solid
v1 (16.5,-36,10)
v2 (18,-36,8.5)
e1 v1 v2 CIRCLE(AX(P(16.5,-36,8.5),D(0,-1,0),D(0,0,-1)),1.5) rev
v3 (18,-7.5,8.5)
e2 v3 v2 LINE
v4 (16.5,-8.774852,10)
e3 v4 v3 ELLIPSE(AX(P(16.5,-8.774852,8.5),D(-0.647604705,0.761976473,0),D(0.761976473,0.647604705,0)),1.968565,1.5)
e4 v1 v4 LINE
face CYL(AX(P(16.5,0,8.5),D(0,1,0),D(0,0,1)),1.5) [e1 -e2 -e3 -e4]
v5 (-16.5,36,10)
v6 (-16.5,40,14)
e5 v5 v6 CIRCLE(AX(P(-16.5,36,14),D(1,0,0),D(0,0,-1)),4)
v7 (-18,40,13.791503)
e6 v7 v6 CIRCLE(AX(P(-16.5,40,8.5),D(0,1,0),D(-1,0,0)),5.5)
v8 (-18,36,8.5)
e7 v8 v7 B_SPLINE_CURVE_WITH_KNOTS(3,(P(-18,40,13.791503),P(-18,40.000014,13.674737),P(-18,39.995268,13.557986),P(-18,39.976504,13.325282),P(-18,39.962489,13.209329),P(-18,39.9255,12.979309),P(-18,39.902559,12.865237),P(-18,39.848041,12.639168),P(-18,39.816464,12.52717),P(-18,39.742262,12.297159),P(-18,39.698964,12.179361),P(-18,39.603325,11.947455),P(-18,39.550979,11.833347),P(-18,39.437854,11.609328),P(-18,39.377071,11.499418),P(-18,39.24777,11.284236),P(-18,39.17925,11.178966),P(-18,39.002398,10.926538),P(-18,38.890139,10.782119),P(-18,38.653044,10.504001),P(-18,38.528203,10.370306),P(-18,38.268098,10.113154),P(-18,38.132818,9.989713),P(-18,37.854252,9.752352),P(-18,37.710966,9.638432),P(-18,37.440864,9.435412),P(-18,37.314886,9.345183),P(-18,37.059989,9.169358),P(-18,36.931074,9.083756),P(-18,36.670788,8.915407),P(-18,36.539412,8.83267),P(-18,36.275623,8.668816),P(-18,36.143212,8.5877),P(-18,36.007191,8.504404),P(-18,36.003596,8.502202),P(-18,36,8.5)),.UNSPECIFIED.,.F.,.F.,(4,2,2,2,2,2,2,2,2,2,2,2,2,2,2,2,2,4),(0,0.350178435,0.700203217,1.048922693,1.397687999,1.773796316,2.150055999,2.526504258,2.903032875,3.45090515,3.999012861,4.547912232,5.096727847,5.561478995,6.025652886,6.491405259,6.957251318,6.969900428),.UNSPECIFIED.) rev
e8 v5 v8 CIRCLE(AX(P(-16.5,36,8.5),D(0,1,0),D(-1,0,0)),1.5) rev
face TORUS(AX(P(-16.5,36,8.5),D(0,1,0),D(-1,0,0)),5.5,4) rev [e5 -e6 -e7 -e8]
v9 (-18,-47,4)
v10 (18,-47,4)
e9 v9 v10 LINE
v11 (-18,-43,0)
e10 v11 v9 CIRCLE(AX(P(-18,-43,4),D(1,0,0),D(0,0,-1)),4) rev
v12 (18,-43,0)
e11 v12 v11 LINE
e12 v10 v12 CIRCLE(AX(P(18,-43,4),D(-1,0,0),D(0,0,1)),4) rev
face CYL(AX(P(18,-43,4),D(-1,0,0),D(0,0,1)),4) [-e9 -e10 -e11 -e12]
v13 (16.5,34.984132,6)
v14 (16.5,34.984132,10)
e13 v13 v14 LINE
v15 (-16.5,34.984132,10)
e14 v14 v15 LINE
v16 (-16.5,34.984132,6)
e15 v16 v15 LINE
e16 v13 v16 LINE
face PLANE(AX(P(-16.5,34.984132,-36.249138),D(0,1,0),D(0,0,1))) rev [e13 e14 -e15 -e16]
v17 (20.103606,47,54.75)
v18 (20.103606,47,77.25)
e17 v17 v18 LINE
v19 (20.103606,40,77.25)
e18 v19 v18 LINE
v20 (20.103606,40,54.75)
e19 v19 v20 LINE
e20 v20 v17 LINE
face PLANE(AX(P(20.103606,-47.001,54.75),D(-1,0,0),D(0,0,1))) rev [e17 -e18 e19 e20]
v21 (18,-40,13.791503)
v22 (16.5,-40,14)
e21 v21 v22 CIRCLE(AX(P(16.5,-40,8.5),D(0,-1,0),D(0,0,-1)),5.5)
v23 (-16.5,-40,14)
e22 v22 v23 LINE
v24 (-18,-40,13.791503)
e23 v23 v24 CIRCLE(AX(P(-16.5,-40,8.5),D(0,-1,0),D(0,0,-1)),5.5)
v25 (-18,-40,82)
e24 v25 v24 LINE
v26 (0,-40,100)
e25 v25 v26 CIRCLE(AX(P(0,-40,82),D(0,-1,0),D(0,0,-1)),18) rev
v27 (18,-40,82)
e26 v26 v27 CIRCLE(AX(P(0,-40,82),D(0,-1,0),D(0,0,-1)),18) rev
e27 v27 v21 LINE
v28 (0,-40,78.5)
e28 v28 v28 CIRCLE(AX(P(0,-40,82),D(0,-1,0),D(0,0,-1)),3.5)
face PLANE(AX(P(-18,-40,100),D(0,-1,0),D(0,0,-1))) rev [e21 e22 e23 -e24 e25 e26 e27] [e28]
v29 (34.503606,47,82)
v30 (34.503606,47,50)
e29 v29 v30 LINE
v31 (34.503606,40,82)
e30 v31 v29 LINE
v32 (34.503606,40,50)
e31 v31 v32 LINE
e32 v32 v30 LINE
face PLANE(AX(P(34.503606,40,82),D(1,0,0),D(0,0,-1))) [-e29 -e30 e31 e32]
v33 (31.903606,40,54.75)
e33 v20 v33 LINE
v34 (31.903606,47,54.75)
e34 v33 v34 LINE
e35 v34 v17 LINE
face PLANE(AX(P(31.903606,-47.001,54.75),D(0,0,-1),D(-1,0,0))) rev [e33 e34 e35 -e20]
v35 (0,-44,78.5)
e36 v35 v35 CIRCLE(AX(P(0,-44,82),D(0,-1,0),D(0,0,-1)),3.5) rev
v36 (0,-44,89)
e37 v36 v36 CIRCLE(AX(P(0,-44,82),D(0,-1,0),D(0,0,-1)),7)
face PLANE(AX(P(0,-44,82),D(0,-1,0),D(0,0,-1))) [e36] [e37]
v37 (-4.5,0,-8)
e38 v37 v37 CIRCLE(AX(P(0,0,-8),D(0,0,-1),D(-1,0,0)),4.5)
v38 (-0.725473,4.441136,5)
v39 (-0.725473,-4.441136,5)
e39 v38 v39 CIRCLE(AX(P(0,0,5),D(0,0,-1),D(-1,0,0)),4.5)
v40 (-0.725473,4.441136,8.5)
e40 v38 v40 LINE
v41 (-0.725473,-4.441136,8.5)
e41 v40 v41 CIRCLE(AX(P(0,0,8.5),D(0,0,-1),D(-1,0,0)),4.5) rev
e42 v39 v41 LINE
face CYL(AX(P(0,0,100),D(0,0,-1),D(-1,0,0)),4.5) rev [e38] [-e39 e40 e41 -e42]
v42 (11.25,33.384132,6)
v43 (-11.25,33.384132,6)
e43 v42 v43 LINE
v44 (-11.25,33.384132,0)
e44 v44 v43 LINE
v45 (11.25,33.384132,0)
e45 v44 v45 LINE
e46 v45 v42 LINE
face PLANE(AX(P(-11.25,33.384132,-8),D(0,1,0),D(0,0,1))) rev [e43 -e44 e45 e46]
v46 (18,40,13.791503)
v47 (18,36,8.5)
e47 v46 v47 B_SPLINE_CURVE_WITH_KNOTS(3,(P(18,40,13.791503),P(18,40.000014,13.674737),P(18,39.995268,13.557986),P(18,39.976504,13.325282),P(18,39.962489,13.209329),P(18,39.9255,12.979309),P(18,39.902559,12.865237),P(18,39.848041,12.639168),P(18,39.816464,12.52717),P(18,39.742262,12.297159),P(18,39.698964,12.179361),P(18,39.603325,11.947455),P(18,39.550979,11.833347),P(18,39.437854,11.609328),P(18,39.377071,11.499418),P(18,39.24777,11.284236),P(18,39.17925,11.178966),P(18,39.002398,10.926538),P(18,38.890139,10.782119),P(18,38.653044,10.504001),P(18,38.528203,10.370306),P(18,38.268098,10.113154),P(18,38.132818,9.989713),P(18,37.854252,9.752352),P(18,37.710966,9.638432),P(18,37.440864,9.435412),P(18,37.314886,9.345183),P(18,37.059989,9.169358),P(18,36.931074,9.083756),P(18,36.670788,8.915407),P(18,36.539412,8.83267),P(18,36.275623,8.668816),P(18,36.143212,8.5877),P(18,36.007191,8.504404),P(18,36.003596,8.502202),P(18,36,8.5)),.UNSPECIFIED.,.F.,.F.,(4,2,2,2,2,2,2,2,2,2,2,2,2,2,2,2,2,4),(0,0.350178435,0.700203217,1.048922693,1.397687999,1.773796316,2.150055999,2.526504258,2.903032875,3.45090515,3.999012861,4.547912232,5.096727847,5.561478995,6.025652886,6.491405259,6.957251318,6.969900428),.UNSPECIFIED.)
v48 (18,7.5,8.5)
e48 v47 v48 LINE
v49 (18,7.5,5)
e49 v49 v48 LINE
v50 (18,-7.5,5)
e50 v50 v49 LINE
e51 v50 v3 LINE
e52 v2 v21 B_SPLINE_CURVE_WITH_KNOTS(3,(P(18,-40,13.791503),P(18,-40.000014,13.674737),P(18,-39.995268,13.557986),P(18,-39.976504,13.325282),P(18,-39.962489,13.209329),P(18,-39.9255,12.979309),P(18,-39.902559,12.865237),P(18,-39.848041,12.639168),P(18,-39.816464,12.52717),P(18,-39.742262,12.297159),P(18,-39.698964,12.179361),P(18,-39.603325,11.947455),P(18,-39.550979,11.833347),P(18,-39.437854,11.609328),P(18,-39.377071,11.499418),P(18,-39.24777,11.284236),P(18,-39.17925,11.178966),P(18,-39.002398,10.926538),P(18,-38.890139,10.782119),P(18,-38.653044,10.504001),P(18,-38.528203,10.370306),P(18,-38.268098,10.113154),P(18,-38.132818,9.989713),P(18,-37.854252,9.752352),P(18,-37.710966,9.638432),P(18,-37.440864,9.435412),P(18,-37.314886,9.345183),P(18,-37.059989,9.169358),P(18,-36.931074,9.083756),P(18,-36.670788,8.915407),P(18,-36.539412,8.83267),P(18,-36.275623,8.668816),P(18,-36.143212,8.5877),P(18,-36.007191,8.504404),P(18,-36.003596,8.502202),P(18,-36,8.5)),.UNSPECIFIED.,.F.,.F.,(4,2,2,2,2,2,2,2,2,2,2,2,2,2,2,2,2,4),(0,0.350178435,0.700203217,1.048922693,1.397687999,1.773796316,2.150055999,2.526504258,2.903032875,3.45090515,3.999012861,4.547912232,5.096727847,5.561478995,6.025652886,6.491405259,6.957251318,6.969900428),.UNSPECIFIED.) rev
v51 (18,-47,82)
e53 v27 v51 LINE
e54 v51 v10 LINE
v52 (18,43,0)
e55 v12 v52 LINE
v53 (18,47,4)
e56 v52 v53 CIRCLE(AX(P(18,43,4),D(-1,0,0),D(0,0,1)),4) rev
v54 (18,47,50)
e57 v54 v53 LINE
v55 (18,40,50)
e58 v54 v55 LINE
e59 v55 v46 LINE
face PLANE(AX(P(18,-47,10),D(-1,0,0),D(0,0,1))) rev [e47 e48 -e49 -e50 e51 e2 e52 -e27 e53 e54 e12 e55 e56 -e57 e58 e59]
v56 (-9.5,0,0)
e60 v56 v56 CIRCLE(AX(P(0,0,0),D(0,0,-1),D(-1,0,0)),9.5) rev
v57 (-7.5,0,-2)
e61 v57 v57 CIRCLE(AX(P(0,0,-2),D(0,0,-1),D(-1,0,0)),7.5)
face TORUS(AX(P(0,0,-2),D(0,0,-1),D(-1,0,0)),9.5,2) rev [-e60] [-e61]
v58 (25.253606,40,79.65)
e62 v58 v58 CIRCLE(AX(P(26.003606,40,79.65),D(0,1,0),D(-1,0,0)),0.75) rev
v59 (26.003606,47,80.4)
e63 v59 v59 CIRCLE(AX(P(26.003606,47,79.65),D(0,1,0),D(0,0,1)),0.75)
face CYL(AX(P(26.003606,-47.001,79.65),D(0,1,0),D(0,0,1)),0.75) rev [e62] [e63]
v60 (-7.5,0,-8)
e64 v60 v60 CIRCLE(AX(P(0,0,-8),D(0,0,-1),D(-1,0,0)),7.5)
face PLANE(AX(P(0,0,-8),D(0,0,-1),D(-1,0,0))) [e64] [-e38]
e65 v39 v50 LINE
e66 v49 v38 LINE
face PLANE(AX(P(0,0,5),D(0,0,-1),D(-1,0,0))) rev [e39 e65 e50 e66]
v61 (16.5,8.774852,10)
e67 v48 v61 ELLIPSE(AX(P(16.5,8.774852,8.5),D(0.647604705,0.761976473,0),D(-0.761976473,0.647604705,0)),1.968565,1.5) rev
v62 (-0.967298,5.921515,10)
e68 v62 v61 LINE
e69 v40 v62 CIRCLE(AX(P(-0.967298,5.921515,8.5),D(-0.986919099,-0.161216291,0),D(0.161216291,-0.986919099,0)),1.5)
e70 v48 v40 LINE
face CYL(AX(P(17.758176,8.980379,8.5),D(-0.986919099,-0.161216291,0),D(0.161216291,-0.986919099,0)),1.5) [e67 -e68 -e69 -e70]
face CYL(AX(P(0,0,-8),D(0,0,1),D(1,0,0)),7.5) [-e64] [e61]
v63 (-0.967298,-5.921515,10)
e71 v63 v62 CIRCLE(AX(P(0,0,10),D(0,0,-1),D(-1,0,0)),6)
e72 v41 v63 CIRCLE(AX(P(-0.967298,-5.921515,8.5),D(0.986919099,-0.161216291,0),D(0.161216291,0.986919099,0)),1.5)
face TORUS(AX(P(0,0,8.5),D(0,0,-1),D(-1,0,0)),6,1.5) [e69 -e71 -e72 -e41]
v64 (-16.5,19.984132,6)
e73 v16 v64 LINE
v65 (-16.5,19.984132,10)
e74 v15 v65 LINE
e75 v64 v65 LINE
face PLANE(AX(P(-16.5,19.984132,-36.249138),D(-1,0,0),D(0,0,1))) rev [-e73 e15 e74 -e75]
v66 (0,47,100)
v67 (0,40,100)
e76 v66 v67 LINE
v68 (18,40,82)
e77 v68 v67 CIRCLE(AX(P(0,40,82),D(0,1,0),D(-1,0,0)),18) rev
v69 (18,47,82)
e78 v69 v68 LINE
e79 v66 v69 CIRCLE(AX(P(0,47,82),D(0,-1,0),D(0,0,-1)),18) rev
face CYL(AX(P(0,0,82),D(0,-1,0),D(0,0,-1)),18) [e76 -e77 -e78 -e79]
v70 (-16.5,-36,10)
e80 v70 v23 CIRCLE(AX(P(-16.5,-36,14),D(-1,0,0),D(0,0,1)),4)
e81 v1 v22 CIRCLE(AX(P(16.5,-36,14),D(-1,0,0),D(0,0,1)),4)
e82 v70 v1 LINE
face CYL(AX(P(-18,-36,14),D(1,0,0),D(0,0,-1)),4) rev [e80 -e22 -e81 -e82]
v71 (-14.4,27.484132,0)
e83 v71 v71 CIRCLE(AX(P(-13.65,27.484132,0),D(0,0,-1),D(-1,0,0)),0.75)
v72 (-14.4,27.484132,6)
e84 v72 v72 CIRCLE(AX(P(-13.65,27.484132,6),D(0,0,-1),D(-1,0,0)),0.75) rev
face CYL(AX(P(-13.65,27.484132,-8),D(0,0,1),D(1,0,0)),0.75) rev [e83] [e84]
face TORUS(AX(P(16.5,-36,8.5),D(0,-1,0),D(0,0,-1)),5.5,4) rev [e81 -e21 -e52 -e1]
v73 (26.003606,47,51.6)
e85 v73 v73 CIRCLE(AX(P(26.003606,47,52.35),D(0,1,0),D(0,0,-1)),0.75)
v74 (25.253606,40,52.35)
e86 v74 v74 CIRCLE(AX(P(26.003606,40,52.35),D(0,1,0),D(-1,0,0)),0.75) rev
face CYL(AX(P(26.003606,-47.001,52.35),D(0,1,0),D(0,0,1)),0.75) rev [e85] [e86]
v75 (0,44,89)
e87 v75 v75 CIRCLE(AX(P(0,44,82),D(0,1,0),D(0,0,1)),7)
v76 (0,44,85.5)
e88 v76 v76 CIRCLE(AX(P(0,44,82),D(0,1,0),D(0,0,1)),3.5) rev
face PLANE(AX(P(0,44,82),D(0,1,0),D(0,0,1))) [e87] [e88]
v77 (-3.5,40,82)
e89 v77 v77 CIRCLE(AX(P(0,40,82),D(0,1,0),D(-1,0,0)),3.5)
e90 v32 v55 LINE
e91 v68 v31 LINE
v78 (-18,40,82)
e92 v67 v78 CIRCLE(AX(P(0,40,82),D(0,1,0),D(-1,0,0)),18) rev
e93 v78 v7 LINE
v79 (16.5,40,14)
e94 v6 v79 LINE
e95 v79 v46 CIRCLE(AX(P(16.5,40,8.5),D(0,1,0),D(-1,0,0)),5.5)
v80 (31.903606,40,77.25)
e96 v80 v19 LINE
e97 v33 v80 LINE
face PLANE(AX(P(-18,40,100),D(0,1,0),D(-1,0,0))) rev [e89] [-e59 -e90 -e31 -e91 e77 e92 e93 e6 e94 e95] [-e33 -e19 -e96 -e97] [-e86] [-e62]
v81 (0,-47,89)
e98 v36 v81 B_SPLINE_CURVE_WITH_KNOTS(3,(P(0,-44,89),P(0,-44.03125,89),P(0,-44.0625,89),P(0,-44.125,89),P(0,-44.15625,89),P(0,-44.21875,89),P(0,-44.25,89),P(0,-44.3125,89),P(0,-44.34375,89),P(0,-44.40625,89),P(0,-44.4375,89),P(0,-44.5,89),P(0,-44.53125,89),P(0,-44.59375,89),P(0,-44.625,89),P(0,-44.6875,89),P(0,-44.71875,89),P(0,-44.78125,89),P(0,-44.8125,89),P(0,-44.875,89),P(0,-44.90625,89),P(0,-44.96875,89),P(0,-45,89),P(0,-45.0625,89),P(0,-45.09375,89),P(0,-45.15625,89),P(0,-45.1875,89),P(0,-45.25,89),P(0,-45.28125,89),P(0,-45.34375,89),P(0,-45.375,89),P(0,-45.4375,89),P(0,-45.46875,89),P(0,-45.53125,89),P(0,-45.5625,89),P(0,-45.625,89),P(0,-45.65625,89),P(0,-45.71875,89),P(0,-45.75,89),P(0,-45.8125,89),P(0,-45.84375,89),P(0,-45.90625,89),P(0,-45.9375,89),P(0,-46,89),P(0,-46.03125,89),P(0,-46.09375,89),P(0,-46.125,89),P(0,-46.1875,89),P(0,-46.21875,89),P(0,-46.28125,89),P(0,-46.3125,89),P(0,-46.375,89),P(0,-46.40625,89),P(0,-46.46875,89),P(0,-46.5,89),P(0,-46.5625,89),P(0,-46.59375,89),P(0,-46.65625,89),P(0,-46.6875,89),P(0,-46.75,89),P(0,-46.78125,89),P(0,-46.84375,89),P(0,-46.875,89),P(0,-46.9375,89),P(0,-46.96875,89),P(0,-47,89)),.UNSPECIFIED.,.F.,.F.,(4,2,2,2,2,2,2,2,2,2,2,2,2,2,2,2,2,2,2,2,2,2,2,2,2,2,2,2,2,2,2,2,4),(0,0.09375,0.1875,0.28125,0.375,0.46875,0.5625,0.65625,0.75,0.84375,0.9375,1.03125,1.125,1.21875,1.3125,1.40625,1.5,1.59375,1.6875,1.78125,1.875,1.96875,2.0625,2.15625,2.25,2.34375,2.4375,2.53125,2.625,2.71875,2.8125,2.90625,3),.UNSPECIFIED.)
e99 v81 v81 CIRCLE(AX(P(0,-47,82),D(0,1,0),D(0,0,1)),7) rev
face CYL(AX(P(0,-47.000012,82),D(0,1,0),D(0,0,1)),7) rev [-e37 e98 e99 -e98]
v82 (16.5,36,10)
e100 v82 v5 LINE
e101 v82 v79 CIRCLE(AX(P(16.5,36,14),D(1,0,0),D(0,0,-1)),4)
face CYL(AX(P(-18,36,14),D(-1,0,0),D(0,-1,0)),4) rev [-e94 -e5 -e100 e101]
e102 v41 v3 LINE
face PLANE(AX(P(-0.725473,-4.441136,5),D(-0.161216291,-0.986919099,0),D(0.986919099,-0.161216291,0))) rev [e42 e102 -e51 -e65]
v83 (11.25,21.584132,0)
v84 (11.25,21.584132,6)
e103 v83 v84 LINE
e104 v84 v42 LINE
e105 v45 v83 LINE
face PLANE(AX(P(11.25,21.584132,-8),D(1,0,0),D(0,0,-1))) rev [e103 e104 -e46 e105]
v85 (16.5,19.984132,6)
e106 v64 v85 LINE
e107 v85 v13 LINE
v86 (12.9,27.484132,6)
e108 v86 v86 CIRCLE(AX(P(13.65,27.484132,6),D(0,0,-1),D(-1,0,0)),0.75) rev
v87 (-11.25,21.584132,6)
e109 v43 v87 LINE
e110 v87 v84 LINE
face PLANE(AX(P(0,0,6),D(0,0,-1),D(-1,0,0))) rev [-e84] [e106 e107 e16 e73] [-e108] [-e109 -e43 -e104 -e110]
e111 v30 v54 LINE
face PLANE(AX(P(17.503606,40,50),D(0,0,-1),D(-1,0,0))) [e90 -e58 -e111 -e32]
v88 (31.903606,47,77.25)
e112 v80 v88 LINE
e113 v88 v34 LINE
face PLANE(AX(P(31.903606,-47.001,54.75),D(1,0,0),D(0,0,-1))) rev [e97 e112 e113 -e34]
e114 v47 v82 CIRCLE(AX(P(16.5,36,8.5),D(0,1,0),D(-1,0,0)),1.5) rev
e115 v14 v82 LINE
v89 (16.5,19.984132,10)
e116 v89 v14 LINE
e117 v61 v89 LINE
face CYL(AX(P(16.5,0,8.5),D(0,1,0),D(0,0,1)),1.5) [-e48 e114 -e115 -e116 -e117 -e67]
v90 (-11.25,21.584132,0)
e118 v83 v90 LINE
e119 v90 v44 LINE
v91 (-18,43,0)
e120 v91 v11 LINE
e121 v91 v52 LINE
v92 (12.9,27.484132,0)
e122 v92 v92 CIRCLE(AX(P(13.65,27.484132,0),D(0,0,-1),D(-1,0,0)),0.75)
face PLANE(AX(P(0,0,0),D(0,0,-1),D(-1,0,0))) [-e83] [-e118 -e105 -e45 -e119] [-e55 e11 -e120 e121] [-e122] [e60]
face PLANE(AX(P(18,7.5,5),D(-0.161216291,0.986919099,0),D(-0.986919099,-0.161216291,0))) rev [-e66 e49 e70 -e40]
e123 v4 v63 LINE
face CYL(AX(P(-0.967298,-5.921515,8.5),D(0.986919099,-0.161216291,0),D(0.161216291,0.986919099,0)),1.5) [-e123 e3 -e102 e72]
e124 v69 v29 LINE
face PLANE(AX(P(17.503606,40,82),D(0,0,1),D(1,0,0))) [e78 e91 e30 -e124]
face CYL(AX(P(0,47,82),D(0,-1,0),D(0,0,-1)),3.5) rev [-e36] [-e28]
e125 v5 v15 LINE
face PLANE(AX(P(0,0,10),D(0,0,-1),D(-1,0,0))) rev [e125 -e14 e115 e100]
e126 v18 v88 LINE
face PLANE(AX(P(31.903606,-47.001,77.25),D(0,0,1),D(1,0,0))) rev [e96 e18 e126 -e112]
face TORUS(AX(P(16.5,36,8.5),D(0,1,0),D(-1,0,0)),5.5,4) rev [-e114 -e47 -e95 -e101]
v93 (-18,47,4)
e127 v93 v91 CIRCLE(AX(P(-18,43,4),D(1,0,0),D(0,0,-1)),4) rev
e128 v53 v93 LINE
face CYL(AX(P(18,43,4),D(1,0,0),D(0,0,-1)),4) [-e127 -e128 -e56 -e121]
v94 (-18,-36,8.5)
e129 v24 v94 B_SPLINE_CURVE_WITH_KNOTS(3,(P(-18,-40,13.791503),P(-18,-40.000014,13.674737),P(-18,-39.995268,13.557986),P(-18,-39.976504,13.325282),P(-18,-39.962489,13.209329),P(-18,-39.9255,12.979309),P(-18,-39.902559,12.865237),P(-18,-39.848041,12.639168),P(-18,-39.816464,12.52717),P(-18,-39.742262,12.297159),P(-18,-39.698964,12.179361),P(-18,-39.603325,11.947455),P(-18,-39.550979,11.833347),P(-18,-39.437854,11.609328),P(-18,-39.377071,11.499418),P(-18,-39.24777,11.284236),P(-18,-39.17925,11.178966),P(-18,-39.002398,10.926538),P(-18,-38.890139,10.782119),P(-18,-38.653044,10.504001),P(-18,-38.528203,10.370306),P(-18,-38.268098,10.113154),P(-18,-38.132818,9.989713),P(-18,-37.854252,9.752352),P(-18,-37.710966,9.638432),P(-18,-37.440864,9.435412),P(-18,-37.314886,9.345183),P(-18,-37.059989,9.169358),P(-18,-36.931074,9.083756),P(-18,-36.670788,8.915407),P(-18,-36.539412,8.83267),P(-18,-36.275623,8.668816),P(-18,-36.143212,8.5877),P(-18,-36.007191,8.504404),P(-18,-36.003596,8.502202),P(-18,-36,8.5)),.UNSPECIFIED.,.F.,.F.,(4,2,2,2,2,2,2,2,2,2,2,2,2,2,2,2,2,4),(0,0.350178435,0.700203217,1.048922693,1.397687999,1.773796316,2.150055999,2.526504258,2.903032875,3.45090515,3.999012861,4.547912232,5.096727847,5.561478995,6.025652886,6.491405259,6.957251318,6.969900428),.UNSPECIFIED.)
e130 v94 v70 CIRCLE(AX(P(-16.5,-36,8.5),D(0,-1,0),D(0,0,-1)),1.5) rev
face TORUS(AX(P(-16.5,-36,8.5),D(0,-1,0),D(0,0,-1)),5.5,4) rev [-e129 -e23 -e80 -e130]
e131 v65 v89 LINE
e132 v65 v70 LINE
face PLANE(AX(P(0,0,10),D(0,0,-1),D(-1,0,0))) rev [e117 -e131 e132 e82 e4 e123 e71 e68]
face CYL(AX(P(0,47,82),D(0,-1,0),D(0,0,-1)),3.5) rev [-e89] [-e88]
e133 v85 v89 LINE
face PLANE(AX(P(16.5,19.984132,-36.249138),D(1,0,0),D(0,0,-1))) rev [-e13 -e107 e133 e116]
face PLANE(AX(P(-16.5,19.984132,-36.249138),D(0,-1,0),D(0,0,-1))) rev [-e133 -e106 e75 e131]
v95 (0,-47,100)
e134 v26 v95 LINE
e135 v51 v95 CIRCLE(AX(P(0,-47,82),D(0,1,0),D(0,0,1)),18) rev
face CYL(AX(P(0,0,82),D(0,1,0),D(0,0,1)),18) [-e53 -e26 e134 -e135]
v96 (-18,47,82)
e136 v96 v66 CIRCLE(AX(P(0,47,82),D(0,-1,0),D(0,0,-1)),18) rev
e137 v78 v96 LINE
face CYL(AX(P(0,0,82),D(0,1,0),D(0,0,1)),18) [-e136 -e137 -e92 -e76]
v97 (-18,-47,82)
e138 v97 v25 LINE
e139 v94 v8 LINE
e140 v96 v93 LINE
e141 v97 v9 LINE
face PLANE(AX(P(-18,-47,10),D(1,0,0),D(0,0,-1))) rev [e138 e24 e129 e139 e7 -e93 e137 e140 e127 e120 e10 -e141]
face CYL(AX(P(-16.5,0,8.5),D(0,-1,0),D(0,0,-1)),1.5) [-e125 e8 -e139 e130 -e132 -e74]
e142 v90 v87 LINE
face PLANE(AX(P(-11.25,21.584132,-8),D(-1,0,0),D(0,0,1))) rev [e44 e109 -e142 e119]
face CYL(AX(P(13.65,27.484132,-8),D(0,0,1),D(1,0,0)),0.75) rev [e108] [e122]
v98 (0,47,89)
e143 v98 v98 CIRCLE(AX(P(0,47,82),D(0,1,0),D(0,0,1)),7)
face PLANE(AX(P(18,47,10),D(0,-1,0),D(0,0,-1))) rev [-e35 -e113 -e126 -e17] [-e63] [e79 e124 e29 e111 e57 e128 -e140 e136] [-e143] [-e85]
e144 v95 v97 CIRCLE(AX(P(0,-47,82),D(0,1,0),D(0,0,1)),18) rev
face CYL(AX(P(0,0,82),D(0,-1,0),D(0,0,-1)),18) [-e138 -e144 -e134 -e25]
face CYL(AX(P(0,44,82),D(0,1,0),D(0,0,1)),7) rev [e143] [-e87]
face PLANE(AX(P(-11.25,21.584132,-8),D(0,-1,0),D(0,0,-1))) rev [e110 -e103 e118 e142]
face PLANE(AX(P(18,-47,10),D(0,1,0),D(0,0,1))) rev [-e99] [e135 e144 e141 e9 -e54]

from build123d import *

# Parameters (mm, degrees)
SKETCH1_W               = 94
SKETCH1_H               = 36
BOSS_EXTRUDE1_DEPTH     = 10
SKETCH2_W               = 36
SKETCH2_H               = 7
BOSS_EXTRUDE2_DEPTH     = 90
CUT_EXTRUDE1_DEPTH      = 139.419651784
CUT_EXTRUDE1_DEPTH_BACK = 139.419651784
SKETCH3_R               = 3.5
CUT_EXTRUDE2_DEPTH      = 139.419651784
CUT_EXTRUDE2_DEPTH_BACK = 3
SKETCH4_R               = 7
CUT_EXTRUDE3_START      = -3
SKETCH5_R               = 7
CUT_EXTRUDE3_DEPTH      = 3
FILLET1_R               = 18
SKETCH6_R               = 7.5
BOSS_EXTRUDE3_DEPTH     = 8
SKETCH7_R               = 4.5
CUT_EXTRUDE4_DEPTH      = 120.151164493
FILLET2_R               = 2
SKETCH9_R               = 0.75
SKETCH9_W               = 22.5
SKETCH9_H               = 11.8
CUT_EXTRUDE5_DEPTH      = 104.116439039
SKETCH10_W              = 33
SKETCH10_H              = 15
CUT_EXTRUDE6_DEPTH      = 4
SKETCH11_W              = 17
SKETCH11_H              = 32
BOSS_EXTRUDE4_DEPTH     = 7
CUT_EXTRUDE7_REACH      = 143.515
SKETCH12_R              = 0.75
SKETCH12_W              = 11.8
SKETCH12_H              = 22.5
CUT_EXTRUDE8_START      = -5
CUT_EXTRUDE8_DEPTH      = 5
FILLET3_R               = 1.5
FILLET4_R               = 4


# Some blends are built 0.0001 mm under size
with BuildPart() as part:
    # Sketch1 → Boss-Extrude1 (new body)
    with BuildSketch(Plane(origin=(0, 0, 0), x_dir=(0, 1, 0), z_dir=(0, 0, 1))):
        Rectangle(SKETCH1_W, SKETCH1_H)
    extrude(amount=BOSS_EXTRUDE1_DEPTH)

    # Sketch2 → Boss-Extrude2 (add)
    with BuildSketch(Plane.XY.offset(10)):
        with Locations((0, 43.5)):
            Rectangle(SKETCH2_W, SKETCH2_H)
        with Locations((0, -43.5)):
            Rectangle(SKETCH2_W, SKETCH2_H)
    extrude(amount=BOSS_EXTRUDE2_DEPTH)

    # Sketch3 → Cut-Extrude1 (cut, two sides: drawn at the far end of the back side and taken through both)
    with BuildSketch(Plane.XZ.offset(47).offset(-CUT_EXTRUDE1_DEPTH_BACK)):
        with Locations(Location((0, 82, 0), (0, 0, 270))):
            Circle(SKETCH3_R)
    extrude(amount=CUT_EXTRUDE1_DEPTH + CUT_EXTRUDE1_DEPTH_BACK, mode=Mode.SUBTRACT)

    # Sketch4 → Cut-Extrude2 (cut, two sides: drawn at the far end of the back side and taken through both)
    with BuildSketch(Plane.XZ.offset(47).offset(-CUT_EXTRUDE2_DEPTH_BACK)):
        with Locations(Location((0, 82, 0), (0, 0, 90))):
            Circle(SKETCH4_R)
    extrude(amount=CUT_EXTRUDE2_DEPTH + CUT_EXTRUDE2_DEPTH_BACK, mode=Mode.SUBTRACT)

    # Sketch5 → Cut-Extrude3 (cut)
    with BuildSketch(Plane(origin=(0, 47, 0), x_dir=(-1, 0, 0), z_dir=(0, 1, 0)).offset(CUT_EXTRUDE3_START)):
        with Locations(Location((0, 82, 0), (0, 0, 90))):
            Circle(SKETCH5_R)
    extrude(amount=CUT_EXTRUDE3_DEPTH, mode=Mode.SUBTRACT)

    # Fillet1
    fillet1_edges = [part.edges().sort_by_distance(p)[0] for p in [
        (18, -43.5, 100),
        (-18, -43.5, 100),
        (18, 43.5, 100),
        (-18, 43.5, 100),
    ]]
    fillet(fillet1_edges, radius=FILLET1_R - 0.0001)  # a hair under: the kernel refuses the full size

    # Sketch6 → Boss-Extrude3 (add)
    with BuildSketch(Plane(origin=(0, 0, 0), x_dir=(1, 0, 0), z_dir=(0, 0, -1))):
        with Locations(Location((0, 0, 0), (0, 0, 180))):
            Circle(SKETCH6_R)
    extrude(amount=BOSS_EXTRUDE3_DEPTH)

    # Sketch7 → Cut-Extrude4 (cut, through all)
    with BuildSketch(Plane(origin=(0, 0, -8), x_dir=(1, 0, 0), z_dir=(0, 0, -1))):
        with Locations(Location((0, 0, 0), (0, 0, 180))):
            Circle(SKETCH7_R)
    extrude(amount=-CUT_EXTRUDE4_DEPTH, mode=Mode.SUBTRACT)

    # Fillet2
    fillet2_edges = [part.edges().sort_by_distance(p)[0] for p in [
        (7.5, 0, 0),
    ]]
    fillet(fillet2_edges, radius=FILLET2_R)

    # Sketch9 → Cut-Extrude5 (cut, through all)
    with BuildSketch(Plane.XY.offset(10)):
        with Locations((-13.65, 27.484131785)):
            Circle(SKETCH9_R)
        with Locations((13.65, 27.484131785)):
            Circle(SKETCH9_R)
        with Locations((0, 27.484131785)):
            Rectangle(SKETCH9_W, SKETCH9_H)
    extrude(amount=-CUT_EXTRUDE5_DEPTH, mode=Mode.SUBTRACT)

    # Sketch10 → Cut-Extrude6 (cut)
    with BuildSketch(Plane.XY.offset(10)):
        with Locations((0, 27.484131785)):
            Rectangle(SKETCH10_W, SKETCH10_H)
    extrude(amount=-CUT_EXTRUDE6_DEPTH, mode=Mode.SUBTRACT)

    # Sketch11 → Boss-Extrude4 (add)
    with BuildSketch(Plane(origin=(0, 47, 0), x_dir=(-1, 0, 0), z_dir=(0, 1, 0))):
        with Locations((-26.003605519, 66)):
            Rectangle(SKETCH11_W, SKETCH11_H)
    extrude(amount=-BOSS_EXTRUDE4_DEPTH)

    # Sketch12 → Cut-Extrude7 (cut, up to next)
    with BuildSketch(Plane(origin=(0, 47, 0), x_dir=(-1, 0, 0), z_dir=(0, 1, 0)), mode=Mode.PRIVATE) as cut_extrude7_sk1:
        with Locations(Location((-26.003605519, 79.65, 0), (0, 0, 90))):
            Circle(SKETCH12_R)
    cut_extrude7_tool1 = extrude(cut_extrude7_sk1.sketch, amount=-CUT_EXTRUDE7_REACH, mode=Mode.PRIVATE) & part.part
    # Sketch12 → Cut-Extrude7 (cut, up to next)
    with BuildSketch(Plane(origin=(0, 47, 0), x_dir=(-1, 0, 0), z_dir=(0, 1, 0)), mode=Mode.PRIVATE) as cut_extrude7_sk2:
        with Locations((-26.003605519, 52.35)):
            Circle(SKETCH12_R)
    cut_extrude7_tool2 = extrude(cut_extrude7_sk2.sketch, amount=-CUT_EXTRUDE7_REACH, mode=Mode.PRIVATE) & part.part
    # Sketch12 → Cut-Extrude7 (cut, up to next)
    with BuildSketch(Plane(origin=(0, 47, 0), x_dir=(-1, 0, 0), z_dir=(0, 1, 0)), mode=Mode.PRIVATE) as cut_extrude7_sk3:
        with Locations((-26.003605519, 66)):
            Rectangle(SKETCH12_W, SKETCH12_H)
    cut_extrude7_tool3 = extrude(cut_extrude7_sk3.sketch, amount=-CUT_EXTRUDE7_REACH, mode=Mode.PRIVATE) & part.part
    add(cut_extrude7_tool1.solids().sort_by_distance((26.003606, 47, 79.65))[0], mode=Mode.SUBTRACT)
    add(cut_extrude7_tool2.solids().sort_by_distance((26.003606, 47, 52.35))[0], mode=Mode.SUBTRACT)
    add(cut_extrude7_tool3.solids().sort_by_distance((26.003606, 47, 66))[0], mode=Mode.SUBTRACT)

    # Sketch13 → Cut-Extrude8 (cut)
    with BuildSketch(Plane.XY.offset(10).offset(CUT_EXTRUDE8_START)):
        with BuildLine():
            Line((18, -7.5), (18, 7.5))
            Line((18, 7.5), (-0.72547331, 4.441135944))
            ThreePointArc((-0.72547331, 4.441135944), (4.5, 0), (-0.72547331, -4.441135944))
            Line((-0.72547331, -4.441135944), (18, -7.5))
        make_face()
    extrude(amount=CUT_EXTRUDE8_DEPTH, mode=Mode.SUBTRACT)

    # Fillet3
    fillet3_edges = [part.edges().sort_by_distance(p)[0] for p in [
        (-18, 0, 10),
        (18, -23.75, 10),
        (-3.428894129, 2.914221174, 10),
        (18, 23.75, 10),
        (8.637263345, -5.970567972, 10),
        (8.637263345, 5.970567972, 10),
    ]]
    fillet(fillet3_edges, radius=FILLET3_R - 0.0001)  # a hair under: the kernel refuses the full size

    # Fillet4
    # the kernel refuses this fillet: 4 mm, written as the material it adds along each edge
    with BuildSketch(Plane(origin=(16.5001, 40, 10), x_dir=(0, -1, 0), z_dir=(-1, 0, 0))) as fillet4_piece_1:
        with BuildLine():
            CenterArc((FILLET4_R, FILLET4_R), FILLET4_R, 180, 90)
            Line((0, FILLET4_R), (0, 0))
            Line((0, 0), (FILLET4_R, 0))
        make_face()
    extrude(amount=33.0002)
    with BuildSketch(Plane(origin=(16.5001, -40, 10), x_dir=(0, 1, 0), z_dir=(-1, 0, 0))) as fillet4_piece_2:
        with BuildLine():
            CenterArc((FILLET4_R, -FILLET4_R), FILLET4_R, 90, 90)
            Line((0, -FILLET4_R), (0, 0))
            Line((0, 0), (FILLET4_R, 0))
        make_face()
    extrude(amount=33.0002)
    with BuildSketch(Plane(origin=(-16.5001, -40, 8.5001), x_dir=(0.006283143965556653, 0, 0.9999802608561371), z_dir=(-0.9999802608561371, 0, 0.006283143965556653))) as fillet4_piece_3_section:
        with BuildLine():
            CenterArc((-1.4999 - FILLET4_R, FILLET4_R), FILLET4_R, 270, 90)
            Line((-1.4999 - FILLET4_R, 0), (-1.4999, 0))
            Line((-1.4999, 0), (-1.4999, FILLET4_R))
        make_face()
    fillet4_piece_3 = revolve(axis=Axis((-16.5001, -40, 8.5001), (0, 1, 0)), revolution_arc=359.64, mode=Mode.PRIVATE)
    fillet4_piece_3 = split(fillet4_piece_3, bisect_by=Plane(origin=(-18, -38.511467158, 9.644627934), z_dir=(1, 0, 0)), keep=Keep.TOP, mode=Mode.PRIVATE)
    add(fillet4_piece_3)
    with BuildSketch(Plane(origin=(-16.5001, 40, 8.5001), x_dir=(0.006283143965556653, 0, 0.9999802608561371), z_dir=(-0.9999802608561371, 0, 0.006283143965556653))) as fillet4_piece_4_section:
        with BuildLine():
            CenterArc((-1.4999 - FILLET4_R, -FILLET4_R), FILLET4_R, 0, 90)
            Line((-1.4999 - FILLET4_R, 0), (-1.4999, 0))
            Line((-1.4999, 0), (-1.4999, -FILLET4_R))
        make_face()
    fillet4_piece_4 = revolve(axis=Axis((-16.5001, 40, 8.5001), (0, 1, 0)), revolution_arc=359.64, mode=Mode.PRIVATE)
    fillet4_piece_4 = split(fillet4_piece_4, bisect_by=Plane(origin=(-18, 38.511467158, 9.644627939), z_dir=(1, 0, 0)), keep=Keep.TOP, mode=Mode.PRIVATE)
    add(fillet4_piece_4)
    with BuildSketch(Plane(origin=(16.5001, -40, 8.5001), x_dir=(-0.006283143965559021, 0, 0.9999802608561371), z_dir=(0.9999802608561371, 0, 0.006283143965559021))) as fillet4_piece_5_section:
        with BuildLine():
            CenterArc((-1.4999 - FILLET4_R, -FILLET4_R), FILLET4_R, 0, 90)
            Line((-1.4999 - FILLET4_R, 0), (-1.4999, 0))
            Line((-1.4999, 0), (-1.4999, -FILLET4_R))
        make_face()
    fillet4_piece_5 = revolve(axis=Axis((16.5001, -40, 8.5001), (0, -1, 0)), revolution_arc=359.64, mode=Mode.PRIVATE)
    fillet4_piece_5 = split(fillet4_piece_5, bisect_by=Plane(origin=(18, -38.511467161, 9.644627937), z_dir=(-1, 0, 0)), keep=Keep.TOP, mode=Mode.PRIVATE)
    add(fillet4_piece_5)
    with BuildSketch(Plane(origin=(16.5001, 40, 8.5001), x_dir=(-0.006283143965559021, 0, 0.9999802608561371), z_dir=(0.9999802608561371, 0, 0.006283143965559021))) as fillet4_piece_6_section:
        with BuildLine():
            CenterArc((-1.4999 - FILLET4_R, FILLET4_R), FILLET4_R, 270, 90)
            Line((-1.4999, FILLET4_R), (-1.4999, 0))
            Line((-1.4999, 0), (-1.4999 - FILLET4_R, 0))
        make_face()
    fillet4_piece_6 = revolve(axis=Axis((16.5001, 40, 8.5001), (0, -1, 0)), revolution_arc=359.64, mode=Mode.PRIVATE)
    fillet4_piece_6 = split(fillet4_piece_6, bisect_by=Plane(origin=(18, 38.511467202, 9.644627972), z_dir=(-1, 0, 0)), keep=Keep.TOP, mode=Mode.PRIVATE)
    add(fillet4_piece_6)
    # the kernel refuses this fillet: 4 mm, written as the material it takes off along each edge
    with BuildSketch(Plane(origin=(-28, -47, 0), x_dir=(0, 0, 1), z_dir=(1, 0, 0))) as fillet4_2_piece_1:
        with BuildLine():
            CenterArc((FILLET4_R, -FILLET4_R), FILLET4_R, 90, 90)
            Line((0, -FILLET4_R), (0, 0))
            Line((0, 0), (FILLET4_R, 0))
        make_face()
    extrude(amount=56, mode=Mode.SUBTRACT)
    with BuildSketch(Plane(origin=(28, 47, 0), x_dir=(0, -1, 0), z_dir=(-1, 0, 0))) as fillet4_2_piece_2:
        with BuildLine():
            CenterArc((FILLET4_R, FILLET4_R), FILLET4_R, 180, 90)
            Line((0, FILLET4_R), (0, 0))
            Line((0, 0), (FILLET4_R, 0))
        make_face()
    extrude(amount=56, mode=Mode.SUBTRACT)


solid = part.part
